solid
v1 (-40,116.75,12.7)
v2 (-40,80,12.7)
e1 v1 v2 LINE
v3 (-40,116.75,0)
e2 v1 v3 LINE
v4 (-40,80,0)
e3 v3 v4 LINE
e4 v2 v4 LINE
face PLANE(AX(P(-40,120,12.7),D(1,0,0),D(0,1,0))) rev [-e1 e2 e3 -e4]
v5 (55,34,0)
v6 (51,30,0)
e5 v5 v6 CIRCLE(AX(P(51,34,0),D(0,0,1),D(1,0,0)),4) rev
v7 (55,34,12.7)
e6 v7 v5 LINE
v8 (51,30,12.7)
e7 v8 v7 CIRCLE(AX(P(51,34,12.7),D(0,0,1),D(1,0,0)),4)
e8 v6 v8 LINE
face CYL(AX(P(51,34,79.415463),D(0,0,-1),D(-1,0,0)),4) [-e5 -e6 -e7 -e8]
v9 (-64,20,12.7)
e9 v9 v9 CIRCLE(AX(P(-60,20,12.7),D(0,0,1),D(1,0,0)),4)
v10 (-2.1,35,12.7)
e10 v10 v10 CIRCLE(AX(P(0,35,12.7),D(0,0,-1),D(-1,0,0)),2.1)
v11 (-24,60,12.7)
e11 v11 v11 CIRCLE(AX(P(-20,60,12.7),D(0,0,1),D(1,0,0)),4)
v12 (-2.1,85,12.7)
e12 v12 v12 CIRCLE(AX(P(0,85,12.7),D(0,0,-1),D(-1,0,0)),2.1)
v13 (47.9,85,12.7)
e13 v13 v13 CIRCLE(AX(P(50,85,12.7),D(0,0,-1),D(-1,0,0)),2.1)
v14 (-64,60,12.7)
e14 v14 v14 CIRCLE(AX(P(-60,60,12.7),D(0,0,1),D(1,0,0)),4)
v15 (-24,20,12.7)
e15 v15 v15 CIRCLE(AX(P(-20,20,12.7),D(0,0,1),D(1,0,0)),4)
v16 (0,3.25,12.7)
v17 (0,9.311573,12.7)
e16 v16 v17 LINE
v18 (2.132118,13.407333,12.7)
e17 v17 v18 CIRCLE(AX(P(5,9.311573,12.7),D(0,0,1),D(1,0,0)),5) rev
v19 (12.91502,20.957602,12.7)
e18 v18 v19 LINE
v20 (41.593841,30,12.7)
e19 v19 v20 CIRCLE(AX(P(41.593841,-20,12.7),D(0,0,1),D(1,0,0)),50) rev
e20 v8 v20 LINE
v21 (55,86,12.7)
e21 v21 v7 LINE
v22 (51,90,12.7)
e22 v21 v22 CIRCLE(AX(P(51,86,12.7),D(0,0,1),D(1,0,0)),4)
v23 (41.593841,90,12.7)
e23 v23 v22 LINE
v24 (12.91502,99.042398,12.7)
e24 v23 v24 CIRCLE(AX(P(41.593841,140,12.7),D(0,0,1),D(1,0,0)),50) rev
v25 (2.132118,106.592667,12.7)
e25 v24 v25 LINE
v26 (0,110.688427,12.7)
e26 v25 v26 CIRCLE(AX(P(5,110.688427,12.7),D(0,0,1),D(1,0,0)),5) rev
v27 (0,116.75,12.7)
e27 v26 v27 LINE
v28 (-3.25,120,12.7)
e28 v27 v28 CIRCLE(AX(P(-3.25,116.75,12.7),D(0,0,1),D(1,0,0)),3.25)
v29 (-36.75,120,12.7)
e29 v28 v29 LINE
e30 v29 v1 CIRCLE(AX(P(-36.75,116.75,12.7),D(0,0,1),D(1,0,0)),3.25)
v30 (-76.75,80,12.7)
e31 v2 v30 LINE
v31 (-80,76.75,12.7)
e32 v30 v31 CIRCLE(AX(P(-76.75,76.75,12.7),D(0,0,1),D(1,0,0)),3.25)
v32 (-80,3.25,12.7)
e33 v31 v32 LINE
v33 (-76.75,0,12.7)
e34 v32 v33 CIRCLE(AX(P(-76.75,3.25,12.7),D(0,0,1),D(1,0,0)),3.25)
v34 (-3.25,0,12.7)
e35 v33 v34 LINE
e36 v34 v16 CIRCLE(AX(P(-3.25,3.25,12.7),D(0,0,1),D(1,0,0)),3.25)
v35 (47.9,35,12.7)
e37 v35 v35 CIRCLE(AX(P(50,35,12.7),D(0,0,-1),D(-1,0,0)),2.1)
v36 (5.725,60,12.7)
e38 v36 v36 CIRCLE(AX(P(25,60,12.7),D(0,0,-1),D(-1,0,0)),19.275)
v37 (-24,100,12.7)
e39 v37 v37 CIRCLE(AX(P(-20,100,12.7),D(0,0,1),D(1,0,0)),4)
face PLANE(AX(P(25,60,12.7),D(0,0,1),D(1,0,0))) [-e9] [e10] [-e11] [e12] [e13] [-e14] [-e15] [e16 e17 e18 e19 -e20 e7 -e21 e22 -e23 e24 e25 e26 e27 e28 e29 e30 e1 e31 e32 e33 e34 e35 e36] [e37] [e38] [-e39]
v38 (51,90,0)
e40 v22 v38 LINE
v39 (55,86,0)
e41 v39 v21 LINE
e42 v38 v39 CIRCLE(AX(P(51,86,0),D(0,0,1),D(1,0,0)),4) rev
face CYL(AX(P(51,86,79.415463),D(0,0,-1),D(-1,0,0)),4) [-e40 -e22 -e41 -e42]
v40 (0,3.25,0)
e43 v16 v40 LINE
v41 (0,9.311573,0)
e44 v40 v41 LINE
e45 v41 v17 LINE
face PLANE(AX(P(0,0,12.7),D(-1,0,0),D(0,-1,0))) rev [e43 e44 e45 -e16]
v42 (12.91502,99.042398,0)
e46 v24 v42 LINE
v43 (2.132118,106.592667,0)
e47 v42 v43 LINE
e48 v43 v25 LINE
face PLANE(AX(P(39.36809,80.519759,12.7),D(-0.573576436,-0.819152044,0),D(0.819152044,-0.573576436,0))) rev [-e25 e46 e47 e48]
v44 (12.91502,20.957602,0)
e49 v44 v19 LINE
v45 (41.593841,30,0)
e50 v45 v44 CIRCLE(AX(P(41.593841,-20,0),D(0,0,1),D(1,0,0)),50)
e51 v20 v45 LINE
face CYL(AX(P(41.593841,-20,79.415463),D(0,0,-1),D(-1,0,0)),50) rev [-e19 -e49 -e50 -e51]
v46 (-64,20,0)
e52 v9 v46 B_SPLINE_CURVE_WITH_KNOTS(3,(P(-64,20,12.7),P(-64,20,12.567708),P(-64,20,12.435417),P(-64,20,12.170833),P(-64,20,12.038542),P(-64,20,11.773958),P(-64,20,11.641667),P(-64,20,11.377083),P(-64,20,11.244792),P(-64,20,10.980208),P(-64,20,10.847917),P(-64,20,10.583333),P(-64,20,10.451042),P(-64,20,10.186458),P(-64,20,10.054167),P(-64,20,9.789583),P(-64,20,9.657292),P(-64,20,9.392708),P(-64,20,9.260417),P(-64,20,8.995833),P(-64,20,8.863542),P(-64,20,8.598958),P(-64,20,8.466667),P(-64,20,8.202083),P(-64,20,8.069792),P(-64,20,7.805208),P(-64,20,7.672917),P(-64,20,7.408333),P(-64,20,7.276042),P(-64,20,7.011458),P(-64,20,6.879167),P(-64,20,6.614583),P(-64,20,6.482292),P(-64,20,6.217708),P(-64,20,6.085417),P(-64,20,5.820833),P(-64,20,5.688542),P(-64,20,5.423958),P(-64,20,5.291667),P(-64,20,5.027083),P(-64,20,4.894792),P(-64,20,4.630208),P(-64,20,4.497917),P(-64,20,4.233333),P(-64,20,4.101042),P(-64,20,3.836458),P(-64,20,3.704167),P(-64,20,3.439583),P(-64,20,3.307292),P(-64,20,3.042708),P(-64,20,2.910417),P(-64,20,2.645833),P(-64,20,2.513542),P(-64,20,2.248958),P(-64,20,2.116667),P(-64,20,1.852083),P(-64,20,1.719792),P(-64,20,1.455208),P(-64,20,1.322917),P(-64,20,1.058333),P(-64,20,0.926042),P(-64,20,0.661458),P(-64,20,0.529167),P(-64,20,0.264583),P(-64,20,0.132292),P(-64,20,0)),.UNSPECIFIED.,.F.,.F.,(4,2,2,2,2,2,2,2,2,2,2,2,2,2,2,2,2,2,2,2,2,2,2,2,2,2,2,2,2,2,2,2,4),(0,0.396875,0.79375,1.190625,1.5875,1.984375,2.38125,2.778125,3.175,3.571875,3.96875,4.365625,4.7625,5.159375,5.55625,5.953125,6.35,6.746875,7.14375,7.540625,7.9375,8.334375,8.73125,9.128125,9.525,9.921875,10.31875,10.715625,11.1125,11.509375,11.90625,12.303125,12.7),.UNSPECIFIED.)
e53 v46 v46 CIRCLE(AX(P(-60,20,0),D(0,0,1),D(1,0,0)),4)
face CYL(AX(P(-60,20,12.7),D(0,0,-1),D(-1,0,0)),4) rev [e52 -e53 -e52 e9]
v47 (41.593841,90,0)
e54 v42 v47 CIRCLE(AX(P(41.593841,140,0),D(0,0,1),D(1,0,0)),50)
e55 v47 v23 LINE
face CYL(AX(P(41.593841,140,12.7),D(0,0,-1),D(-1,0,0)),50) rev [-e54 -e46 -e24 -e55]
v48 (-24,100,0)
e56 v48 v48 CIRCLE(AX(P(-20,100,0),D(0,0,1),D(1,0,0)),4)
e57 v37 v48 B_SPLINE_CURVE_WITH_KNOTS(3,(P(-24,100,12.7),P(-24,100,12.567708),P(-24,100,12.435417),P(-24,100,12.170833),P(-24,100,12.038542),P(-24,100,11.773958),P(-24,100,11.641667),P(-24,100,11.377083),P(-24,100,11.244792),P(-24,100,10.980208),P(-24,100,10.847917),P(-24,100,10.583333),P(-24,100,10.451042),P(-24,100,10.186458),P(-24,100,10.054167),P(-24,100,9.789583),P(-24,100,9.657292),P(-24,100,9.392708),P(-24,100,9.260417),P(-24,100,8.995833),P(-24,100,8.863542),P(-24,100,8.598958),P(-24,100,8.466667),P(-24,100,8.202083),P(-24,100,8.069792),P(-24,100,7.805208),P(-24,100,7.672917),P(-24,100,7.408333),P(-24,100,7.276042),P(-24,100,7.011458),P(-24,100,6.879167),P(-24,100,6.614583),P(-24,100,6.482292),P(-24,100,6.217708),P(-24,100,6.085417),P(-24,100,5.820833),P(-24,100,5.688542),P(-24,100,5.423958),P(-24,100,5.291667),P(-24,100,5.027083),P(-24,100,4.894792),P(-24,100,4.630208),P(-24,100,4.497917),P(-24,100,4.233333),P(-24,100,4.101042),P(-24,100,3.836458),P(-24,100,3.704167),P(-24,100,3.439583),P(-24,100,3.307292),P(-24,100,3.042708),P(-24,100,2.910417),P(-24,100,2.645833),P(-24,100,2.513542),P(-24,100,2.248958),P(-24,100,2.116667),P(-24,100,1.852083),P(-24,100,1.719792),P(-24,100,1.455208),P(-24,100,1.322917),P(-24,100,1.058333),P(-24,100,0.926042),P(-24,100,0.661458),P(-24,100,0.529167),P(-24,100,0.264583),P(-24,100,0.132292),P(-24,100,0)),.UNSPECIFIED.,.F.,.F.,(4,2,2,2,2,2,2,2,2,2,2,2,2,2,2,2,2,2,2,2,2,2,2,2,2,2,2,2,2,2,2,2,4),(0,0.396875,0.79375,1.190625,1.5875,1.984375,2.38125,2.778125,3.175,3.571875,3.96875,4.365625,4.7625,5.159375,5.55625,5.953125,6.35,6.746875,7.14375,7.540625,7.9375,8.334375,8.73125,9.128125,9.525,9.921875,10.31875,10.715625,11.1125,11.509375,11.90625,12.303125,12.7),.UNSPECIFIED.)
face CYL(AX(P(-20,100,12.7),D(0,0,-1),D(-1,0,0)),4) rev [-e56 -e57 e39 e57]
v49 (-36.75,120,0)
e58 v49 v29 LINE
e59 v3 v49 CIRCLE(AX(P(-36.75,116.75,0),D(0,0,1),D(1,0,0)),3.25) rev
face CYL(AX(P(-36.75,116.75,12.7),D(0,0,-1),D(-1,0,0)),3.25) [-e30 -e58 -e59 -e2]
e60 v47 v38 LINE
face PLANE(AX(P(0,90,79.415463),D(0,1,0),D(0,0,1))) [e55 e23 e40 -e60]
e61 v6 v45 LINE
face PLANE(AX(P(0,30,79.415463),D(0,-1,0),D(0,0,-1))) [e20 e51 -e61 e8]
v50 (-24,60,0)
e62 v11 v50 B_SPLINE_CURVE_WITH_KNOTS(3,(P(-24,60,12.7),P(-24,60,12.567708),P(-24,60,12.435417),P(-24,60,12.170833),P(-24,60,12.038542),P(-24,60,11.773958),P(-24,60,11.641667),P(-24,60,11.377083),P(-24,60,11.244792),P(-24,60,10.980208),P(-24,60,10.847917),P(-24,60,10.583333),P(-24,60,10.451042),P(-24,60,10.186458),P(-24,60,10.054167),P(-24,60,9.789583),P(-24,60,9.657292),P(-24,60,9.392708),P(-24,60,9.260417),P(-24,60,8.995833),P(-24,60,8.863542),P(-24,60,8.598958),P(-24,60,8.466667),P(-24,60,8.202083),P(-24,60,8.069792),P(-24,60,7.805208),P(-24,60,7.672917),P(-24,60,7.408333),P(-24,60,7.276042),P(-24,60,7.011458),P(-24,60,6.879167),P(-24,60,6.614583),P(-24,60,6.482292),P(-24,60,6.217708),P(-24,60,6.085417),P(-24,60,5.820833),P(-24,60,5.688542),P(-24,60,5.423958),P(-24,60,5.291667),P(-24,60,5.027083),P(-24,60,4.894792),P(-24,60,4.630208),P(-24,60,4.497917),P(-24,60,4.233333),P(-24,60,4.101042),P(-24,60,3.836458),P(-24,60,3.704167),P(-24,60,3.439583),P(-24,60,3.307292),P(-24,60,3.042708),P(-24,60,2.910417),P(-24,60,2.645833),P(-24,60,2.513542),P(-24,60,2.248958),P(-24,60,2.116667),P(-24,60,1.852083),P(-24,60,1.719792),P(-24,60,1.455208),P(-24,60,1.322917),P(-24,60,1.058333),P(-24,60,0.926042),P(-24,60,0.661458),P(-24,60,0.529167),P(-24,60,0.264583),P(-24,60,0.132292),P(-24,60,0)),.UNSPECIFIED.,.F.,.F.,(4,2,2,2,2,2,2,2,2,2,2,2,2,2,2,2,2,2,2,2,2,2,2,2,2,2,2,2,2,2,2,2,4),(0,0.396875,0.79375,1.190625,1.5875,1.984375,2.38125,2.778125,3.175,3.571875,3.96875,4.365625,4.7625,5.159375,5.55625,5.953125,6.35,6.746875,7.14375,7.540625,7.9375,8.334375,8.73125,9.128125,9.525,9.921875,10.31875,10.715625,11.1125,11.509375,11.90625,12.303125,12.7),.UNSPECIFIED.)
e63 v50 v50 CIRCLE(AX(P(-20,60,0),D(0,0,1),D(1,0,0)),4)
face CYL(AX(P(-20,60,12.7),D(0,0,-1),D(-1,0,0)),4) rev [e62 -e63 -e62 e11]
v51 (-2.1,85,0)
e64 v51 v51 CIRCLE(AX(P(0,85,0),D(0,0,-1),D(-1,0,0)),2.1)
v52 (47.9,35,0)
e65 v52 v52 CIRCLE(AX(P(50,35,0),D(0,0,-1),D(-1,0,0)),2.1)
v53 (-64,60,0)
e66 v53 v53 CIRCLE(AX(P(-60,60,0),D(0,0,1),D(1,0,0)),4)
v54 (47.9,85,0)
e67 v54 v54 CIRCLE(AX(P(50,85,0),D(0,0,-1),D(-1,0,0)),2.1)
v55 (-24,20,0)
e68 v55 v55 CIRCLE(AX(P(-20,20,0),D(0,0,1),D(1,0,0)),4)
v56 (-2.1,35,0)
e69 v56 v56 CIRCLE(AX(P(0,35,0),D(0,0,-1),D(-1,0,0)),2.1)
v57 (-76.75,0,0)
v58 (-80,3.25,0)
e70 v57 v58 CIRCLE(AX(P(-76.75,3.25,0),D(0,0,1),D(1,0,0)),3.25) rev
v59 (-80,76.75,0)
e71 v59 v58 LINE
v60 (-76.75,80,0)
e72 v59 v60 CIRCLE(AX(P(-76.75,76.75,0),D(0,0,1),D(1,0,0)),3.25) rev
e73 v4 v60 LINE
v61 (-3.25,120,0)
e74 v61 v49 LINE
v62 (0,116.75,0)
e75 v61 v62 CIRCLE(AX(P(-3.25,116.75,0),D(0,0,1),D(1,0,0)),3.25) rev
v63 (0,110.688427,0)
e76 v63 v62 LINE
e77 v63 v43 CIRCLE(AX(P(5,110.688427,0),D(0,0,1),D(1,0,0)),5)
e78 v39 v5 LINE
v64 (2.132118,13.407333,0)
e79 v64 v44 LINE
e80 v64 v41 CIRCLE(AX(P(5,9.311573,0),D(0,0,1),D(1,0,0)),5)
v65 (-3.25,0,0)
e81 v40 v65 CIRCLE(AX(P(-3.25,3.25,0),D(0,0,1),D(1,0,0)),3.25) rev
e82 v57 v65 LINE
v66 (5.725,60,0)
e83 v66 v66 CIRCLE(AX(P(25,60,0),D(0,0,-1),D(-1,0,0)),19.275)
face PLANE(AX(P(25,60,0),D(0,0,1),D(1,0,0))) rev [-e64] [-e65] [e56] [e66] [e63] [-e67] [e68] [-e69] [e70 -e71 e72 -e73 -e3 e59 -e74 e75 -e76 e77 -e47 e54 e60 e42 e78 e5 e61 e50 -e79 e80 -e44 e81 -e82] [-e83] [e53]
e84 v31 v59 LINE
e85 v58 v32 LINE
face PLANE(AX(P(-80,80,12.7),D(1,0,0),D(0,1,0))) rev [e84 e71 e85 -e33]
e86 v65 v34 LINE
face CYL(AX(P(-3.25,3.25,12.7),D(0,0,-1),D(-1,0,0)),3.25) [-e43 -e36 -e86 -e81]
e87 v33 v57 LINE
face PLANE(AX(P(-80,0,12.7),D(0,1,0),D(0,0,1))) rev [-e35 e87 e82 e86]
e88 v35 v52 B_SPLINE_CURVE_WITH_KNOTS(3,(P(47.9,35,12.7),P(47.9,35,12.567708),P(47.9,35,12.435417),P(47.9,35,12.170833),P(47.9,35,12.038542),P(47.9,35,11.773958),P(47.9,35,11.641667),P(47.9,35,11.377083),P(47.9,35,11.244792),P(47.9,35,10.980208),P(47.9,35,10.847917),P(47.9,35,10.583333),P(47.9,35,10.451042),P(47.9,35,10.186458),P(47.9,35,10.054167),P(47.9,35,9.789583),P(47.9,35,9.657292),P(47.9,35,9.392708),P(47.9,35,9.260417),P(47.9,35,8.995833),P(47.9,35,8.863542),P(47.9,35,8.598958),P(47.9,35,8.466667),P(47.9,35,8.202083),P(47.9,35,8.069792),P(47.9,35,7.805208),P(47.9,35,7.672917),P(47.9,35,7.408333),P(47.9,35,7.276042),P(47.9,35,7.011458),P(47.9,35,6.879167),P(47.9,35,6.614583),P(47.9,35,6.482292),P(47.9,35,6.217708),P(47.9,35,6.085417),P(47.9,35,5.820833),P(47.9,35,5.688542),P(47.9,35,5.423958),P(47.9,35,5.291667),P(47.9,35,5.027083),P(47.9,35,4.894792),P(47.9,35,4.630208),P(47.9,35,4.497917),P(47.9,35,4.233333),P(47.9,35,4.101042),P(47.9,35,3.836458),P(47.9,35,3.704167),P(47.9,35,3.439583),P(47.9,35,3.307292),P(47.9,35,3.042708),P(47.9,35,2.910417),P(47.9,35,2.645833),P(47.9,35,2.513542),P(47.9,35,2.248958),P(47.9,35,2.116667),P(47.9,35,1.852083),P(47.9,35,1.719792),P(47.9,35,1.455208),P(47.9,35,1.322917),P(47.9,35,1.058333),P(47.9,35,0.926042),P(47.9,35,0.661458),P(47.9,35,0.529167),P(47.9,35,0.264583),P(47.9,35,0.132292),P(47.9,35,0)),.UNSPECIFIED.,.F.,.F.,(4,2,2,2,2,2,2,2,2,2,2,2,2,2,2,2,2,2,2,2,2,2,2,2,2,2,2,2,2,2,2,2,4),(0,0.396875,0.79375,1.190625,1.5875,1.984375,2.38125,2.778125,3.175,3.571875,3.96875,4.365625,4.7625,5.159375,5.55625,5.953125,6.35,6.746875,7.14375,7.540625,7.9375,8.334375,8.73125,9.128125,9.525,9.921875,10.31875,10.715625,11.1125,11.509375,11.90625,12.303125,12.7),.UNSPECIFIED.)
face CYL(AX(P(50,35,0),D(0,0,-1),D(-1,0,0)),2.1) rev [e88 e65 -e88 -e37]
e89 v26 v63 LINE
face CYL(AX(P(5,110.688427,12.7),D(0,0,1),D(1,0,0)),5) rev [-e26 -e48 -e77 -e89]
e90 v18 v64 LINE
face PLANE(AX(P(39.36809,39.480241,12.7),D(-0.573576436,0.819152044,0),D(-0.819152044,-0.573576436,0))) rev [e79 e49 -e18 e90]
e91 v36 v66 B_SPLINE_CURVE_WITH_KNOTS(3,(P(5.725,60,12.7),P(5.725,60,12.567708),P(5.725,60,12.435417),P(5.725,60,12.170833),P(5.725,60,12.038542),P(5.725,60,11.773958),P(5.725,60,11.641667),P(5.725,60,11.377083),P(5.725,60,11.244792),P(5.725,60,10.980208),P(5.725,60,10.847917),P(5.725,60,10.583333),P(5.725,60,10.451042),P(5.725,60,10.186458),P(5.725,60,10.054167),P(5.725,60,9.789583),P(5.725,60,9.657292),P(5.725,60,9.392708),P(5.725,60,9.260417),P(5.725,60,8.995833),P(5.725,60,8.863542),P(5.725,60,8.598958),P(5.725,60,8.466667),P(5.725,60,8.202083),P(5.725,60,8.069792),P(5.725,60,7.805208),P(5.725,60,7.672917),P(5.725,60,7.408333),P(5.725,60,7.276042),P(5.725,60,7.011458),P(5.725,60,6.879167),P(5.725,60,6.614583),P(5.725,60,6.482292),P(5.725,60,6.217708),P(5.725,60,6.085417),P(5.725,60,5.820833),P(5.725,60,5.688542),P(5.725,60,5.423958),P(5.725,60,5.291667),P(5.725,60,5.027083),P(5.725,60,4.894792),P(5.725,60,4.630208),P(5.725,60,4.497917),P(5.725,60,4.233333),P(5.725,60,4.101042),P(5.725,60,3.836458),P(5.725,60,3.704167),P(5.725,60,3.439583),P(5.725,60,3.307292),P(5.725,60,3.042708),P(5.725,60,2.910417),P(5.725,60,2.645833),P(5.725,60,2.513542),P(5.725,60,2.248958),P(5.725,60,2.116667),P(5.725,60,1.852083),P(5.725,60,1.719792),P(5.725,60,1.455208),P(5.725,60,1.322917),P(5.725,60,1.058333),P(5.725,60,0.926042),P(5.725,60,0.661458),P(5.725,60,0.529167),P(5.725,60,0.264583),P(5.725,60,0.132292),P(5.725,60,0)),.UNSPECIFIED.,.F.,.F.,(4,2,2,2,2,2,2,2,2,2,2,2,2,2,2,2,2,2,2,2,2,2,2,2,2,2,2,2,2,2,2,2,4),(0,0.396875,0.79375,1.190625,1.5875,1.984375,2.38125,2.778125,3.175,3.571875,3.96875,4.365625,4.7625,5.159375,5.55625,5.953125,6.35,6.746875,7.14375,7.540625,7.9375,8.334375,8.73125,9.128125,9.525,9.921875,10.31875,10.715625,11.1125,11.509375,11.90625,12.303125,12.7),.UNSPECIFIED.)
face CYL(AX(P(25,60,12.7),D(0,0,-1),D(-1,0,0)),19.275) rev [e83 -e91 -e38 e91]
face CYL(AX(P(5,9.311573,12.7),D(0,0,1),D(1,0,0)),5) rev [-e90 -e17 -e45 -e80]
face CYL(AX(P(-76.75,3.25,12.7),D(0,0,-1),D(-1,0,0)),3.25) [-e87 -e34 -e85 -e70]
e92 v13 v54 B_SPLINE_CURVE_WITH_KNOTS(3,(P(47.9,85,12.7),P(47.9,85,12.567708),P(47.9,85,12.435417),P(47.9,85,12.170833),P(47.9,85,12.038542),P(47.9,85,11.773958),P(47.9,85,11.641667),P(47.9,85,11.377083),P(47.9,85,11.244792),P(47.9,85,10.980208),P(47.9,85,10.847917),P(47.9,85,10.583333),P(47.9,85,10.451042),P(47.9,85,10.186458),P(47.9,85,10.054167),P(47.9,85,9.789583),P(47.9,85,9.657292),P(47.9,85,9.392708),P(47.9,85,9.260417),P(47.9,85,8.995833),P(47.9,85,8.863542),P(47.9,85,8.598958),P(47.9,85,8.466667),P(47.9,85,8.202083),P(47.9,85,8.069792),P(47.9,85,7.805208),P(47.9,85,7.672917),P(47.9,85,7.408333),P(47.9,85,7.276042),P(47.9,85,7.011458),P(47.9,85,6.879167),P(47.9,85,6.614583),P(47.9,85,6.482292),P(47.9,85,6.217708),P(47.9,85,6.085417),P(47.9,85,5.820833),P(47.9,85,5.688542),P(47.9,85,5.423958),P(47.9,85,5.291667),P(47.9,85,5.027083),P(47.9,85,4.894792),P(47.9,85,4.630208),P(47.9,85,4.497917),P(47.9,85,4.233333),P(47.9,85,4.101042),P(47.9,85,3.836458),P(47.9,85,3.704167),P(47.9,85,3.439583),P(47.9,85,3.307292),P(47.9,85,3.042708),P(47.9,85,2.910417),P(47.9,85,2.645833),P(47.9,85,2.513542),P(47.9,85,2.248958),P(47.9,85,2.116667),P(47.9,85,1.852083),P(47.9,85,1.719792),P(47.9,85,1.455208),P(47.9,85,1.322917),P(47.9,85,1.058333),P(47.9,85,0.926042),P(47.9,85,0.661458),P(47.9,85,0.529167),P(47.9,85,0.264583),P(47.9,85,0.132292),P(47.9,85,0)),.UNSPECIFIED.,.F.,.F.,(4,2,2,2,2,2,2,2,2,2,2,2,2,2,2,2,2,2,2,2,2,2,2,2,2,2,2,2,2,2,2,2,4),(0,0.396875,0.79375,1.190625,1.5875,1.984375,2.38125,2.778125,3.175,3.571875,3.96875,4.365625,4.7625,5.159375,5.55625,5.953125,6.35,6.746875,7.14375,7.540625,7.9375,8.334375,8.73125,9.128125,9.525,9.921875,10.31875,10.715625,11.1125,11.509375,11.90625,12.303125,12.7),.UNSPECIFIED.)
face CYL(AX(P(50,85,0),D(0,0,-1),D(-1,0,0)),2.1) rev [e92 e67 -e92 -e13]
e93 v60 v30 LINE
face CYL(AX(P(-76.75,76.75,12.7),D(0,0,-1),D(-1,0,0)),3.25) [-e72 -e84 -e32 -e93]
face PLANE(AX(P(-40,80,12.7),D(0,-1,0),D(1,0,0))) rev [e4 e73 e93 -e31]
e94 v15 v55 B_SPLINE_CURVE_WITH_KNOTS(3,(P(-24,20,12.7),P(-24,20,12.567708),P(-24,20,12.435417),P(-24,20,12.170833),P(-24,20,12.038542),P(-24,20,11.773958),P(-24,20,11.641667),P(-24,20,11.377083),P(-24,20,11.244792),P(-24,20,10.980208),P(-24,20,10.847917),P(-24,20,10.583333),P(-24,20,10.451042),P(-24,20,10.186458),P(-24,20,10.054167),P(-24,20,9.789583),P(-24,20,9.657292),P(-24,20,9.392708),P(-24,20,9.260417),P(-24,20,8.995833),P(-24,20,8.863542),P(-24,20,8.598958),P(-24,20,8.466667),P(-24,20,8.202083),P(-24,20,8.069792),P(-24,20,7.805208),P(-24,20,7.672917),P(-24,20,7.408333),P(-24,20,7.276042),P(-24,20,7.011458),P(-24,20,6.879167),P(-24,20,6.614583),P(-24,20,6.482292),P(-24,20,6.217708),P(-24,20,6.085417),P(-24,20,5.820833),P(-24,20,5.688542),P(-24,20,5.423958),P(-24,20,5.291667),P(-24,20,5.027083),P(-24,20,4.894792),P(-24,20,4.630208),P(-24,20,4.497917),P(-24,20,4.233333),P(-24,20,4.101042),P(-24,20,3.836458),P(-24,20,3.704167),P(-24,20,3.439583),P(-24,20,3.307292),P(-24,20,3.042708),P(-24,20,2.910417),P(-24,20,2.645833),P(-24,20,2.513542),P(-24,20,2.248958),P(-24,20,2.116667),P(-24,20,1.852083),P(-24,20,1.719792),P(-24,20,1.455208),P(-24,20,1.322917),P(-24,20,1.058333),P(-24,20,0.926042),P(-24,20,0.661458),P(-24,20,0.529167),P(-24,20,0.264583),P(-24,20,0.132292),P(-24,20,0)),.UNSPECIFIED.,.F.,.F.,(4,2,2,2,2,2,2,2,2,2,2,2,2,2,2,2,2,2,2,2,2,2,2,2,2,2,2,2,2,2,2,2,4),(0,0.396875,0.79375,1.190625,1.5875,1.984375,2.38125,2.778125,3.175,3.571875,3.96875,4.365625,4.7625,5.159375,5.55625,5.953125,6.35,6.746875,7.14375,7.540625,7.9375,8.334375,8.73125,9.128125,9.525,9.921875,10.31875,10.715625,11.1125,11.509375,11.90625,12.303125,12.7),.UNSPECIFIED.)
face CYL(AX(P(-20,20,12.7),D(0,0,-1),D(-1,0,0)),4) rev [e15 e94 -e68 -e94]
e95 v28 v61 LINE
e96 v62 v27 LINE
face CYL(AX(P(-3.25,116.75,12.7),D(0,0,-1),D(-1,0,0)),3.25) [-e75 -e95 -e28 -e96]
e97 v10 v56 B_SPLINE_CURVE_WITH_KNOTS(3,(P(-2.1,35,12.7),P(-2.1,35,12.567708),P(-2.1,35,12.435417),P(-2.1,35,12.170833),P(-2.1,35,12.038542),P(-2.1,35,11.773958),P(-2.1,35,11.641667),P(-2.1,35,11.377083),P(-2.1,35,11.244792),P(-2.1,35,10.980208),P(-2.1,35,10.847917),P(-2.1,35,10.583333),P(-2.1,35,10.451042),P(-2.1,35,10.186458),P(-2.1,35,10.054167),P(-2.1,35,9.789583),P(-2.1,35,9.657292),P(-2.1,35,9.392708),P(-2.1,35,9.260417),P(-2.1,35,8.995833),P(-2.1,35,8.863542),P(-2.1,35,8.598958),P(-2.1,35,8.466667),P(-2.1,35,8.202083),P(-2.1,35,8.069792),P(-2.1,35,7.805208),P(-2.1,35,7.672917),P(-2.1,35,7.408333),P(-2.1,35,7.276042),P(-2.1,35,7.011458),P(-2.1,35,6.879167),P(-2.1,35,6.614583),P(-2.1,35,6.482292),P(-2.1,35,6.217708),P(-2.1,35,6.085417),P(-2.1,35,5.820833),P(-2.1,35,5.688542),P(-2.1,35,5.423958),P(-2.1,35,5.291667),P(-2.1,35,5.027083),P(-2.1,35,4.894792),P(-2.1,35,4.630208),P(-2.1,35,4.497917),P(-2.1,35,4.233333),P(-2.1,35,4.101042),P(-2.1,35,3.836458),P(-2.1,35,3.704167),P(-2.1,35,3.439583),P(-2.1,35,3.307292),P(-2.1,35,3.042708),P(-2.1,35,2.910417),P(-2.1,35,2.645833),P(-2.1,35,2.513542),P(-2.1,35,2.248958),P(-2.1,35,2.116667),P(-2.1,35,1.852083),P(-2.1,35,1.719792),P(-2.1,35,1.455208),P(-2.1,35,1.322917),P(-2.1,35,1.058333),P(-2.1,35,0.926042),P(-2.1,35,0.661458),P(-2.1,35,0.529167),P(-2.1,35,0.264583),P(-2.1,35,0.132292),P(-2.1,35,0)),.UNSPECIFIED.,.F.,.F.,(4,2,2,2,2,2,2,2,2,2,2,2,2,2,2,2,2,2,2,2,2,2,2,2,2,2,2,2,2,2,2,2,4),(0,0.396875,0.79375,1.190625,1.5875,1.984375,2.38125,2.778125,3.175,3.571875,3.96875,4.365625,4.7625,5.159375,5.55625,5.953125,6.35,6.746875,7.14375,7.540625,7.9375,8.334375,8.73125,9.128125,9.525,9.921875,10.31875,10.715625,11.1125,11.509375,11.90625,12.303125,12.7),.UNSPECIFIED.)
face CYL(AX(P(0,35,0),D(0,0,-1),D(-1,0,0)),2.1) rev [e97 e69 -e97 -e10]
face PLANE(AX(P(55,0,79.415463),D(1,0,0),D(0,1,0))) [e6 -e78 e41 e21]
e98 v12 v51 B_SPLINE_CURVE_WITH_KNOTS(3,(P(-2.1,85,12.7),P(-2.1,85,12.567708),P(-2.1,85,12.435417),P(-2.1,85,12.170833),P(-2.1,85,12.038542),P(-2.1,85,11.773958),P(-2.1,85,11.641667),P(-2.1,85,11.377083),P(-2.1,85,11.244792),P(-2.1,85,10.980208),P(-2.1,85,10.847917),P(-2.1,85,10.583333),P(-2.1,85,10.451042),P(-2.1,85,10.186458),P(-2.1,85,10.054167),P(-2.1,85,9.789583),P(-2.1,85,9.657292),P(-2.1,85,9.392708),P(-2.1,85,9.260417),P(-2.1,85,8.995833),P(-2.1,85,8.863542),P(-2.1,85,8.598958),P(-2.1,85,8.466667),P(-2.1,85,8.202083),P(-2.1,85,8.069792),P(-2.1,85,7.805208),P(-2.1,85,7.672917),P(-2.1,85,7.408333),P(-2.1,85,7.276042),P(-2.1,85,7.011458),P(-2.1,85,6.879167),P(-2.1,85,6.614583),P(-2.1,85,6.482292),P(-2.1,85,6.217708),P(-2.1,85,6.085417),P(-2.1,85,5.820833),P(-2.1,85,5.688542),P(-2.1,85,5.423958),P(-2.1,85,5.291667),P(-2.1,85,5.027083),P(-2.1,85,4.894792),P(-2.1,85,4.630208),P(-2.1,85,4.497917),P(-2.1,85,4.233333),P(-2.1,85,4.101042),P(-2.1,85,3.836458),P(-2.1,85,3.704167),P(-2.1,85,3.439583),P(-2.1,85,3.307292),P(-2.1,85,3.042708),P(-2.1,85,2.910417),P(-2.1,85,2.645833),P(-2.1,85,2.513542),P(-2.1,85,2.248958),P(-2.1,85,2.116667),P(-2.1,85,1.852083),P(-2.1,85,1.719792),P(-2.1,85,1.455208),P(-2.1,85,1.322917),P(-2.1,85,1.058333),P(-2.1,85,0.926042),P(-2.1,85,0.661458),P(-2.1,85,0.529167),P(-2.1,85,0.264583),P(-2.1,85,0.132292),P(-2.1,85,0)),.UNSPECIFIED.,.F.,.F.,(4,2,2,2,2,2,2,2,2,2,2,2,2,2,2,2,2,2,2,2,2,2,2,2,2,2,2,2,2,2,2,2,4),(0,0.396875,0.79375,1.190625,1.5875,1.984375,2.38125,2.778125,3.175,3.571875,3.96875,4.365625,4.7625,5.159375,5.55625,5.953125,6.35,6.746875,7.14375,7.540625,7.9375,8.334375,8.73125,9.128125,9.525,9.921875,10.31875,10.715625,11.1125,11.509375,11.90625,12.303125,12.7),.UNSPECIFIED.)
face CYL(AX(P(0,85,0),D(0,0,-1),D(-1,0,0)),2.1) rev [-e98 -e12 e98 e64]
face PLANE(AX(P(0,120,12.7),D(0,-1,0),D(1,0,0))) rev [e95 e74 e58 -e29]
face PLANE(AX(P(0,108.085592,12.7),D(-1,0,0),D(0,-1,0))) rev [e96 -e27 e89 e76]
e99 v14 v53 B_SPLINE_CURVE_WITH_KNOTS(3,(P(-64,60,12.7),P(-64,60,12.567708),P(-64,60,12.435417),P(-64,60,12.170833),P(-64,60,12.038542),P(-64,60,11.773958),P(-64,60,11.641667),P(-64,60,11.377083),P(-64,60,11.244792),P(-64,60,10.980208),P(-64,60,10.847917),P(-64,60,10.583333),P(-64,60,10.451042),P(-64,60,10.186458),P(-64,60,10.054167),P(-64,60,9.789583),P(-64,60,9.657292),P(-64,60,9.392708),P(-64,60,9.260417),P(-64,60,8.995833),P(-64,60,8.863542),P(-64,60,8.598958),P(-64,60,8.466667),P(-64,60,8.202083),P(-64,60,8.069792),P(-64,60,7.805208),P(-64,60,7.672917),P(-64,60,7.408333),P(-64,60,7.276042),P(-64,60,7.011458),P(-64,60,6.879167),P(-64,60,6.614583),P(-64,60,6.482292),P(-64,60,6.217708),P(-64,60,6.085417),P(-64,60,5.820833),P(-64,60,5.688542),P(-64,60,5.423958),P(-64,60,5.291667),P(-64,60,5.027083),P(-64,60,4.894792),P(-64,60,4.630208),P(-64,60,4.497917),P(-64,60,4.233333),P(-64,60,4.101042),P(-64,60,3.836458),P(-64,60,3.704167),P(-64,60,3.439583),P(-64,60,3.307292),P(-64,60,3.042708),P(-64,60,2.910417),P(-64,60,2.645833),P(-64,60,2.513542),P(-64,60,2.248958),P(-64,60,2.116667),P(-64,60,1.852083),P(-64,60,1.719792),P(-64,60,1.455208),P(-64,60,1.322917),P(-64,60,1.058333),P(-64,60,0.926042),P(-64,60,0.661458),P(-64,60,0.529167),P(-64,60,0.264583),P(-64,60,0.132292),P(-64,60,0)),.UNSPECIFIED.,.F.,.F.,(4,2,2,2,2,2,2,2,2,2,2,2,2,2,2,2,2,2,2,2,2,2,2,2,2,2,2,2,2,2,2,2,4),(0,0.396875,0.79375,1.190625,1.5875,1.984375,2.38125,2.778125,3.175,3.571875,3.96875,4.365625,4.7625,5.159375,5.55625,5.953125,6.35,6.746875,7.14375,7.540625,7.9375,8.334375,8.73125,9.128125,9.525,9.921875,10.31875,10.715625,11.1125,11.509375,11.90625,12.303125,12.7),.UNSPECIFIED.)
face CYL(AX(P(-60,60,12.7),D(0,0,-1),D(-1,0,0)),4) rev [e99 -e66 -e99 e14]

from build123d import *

# Parameters (mm, degrees)
SKETCH1_R                = 4
SKETCH1_R_2              = 13.05
BOSS_EXTRUDE1_DEPTH      = 12.7
BOSS_EXTRUDE2_START      = -3.2
SKETCH2_R                = 13.05
SKETCH2_R_2              = 10
BOSS_EXTRUDE2_DEPTH      = 3.2
FILLET1_R                = 5
FILLET2_R                = 3.25
BOSS_EXTRUDE3_START      = -12.7
BOSS_EXTRUDE3_DEPTH      = 12.7
CUT_EXTRUDE1_START       = -12.7
CUT_EXTRUDE1_OUTLINE_R   = 19.275
CUT_EXTRUDE1_OUTLINE_R_2 = 10
CUT_EXTRUDE1_DEPTH       = 12.7
FILLET3_R                = 4
FILLET4_R                = 50
M5X0_8_TAPPED_HOLE1_D    = 4.2


# Read off the part's stored shape, not the designer's step: Boss-Extrude3, Cut-Extrude1
with BuildPart() as part:
    # Sketch1 → Boss-Extrude1 (new body)
    with BuildSketch(Plane.XY):
        with BuildLine():
            Line((0, 0), (0, 11.914408096))
            Line((0, 11.914408096), (39.368089731, 39.480241291))
            ThreePointArc((39.368089731, 39.480241291), (50.05, 60), (39.368089731, 80.519758709))
            Line((39.368089731, 80.519758709), (0, 108.085591904))
            Line((0, 108.085591904), (0, 120))
            Line((0, 120), (-40, 120))
            Line((-40, 120), (-40, 80))
            Line((-40, 80), (-80, 80))
            Line((-80, 80), (-80, 0))
            Line((-80, 0), (0, 0))
        make_face()
        with Locations((-20, 20)):
            Circle(SKETCH1_R, mode=Mode.SUBTRACT)
        with Locations((-60, 20)):
            Circle(SKETCH1_R, mode=Mode.SUBTRACT)
        with Locations((-60, 60)):
            Circle(SKETCH1_R, mode=Mode.SUBTRACT)
        with Locations((-20, 60)):
            Circle(SKETCH1_R, mode=Mode.SUBTRACT)
        with Locations((-20, 100)):
            Circle(SKETCH1_R, mode=Mode.SUBTRACT)
        with Locations((25, 60)):
            Circle(SKETCH1_R_2, mode=Mode.SUBTRACT)
    extrude(amount=BOSS_EXTRUDE1_DEPTH)

    # Sketch2 → Boss-Extrude2 (add)
    with BuildSketch(Plane.XY.offset(12.7).offset(BOSS_EXTRUDE2_START)):
        with Locations((25, 60)):
            Circle(SKETCH2_R)
        with Locations((25, 60)):
            Circle(SKETCH2_R_2, mode=Mode.SUBTRACT)
    extrude(amount=BOSS_EXTRUDE2_DEPTH)

    # Fillet1
    fillet1_edges = [part.edges().sort_by_distance(p)[0] for p in [
        (0, 108.085591904, 6.35),
        (0, 11.914408096, 6.35),
    ]]
    fillet(fillet1_edges, radius=FILLET1_R)

    # Fillet2
    fillet2_edges = [part.edges().sort_by_distance(p)[0] for p in [
        (-80, 0, 6.35),
        (-80, 80, 6.35),
        (-40, 120, 6.35),
        (0, 120, 6.35),
        (0, 0, 6.35),
    ]]
    fillet(fillet2_edges, radius=FILLET2_R)

    # Boss-Extrude3 outline → Boss-Extrude3 (add)
    with BuildSketch(Plane(origin=(0, 0, 0), x_dir=(-1, 0, 0), z_dir=(0, 0, -1)).offset(BOSS_EXTRUDE3_START)):
        with BuildLine():
            Line((-55, 90), (-55, 30))
            Line((-55, 30), (-25.828902028, 30))
            Line((-25.828902028, 30), (-39.368089731, 39.480241291))
            ThreePointArc((-39.368089731, 39.480241291), (-50.05, 60), (-39.368089731, 80.519758709))
            Line((-39.368089731, 80.519758709), (-25.828902028, 90))
            Line((-25.828902028, 90), (-55, 90))
        make_face()
    extrude(amount=BOSS_EXTRUDE3_DEPTH)

    # Cut-Extrude1 outline → Cut-Extrude1 (cut)
    with BuildSketch(Plane(origin=(0, 0, 0), x_dir=(-1, 0, 0), z_dir=(0, 0, -1)).offset(CUT_EXTRUDE1_START)):
        with Locations((-25, 60)):
            Circle(CUT_EXTRUDE1_OUTLINE_R)
        with Locations((-25, 60)):
            Circle(CUT_EXTRUDE1_OUTLINE_R_2, mode=Mode.SUBTRACT)
    extrude(amount=CUT_EXTRUDE1_DEPTH, mode=Mode.SUBTRACT)

    # Fillet3
    fillet3_edges = [part.edges().sort_by_distance(p)[0] for p in [
        (55, 90, 6.35),
        (55, 30, 6.35),
    ]]
    fillet(fillet3_edges, radius=FILLET3_R)

    # Fillet4
    fillet4_edges = [part.edges().sort_by_distance(p)[0] for p in [
        (25.828902028, 30, 6.35),
        (25.828902028, 90, 6.35),
    ]]
    fillet(fillet4_edges, radius=FILLET4_R)

    # M5x0.8 Tapped Hole1 (through all)
    with Locations(Plane(origin=(0, 0, 0), x_dir=(-1, 0, 0), z_dir=(0, 0, -1))):
        with Locations((0, 85), (0, 35), (-50, 85), (-50, 35)):
            Hole(M5X0_8_TAPPED_HOLE1_D / 2)


solid = part.part
